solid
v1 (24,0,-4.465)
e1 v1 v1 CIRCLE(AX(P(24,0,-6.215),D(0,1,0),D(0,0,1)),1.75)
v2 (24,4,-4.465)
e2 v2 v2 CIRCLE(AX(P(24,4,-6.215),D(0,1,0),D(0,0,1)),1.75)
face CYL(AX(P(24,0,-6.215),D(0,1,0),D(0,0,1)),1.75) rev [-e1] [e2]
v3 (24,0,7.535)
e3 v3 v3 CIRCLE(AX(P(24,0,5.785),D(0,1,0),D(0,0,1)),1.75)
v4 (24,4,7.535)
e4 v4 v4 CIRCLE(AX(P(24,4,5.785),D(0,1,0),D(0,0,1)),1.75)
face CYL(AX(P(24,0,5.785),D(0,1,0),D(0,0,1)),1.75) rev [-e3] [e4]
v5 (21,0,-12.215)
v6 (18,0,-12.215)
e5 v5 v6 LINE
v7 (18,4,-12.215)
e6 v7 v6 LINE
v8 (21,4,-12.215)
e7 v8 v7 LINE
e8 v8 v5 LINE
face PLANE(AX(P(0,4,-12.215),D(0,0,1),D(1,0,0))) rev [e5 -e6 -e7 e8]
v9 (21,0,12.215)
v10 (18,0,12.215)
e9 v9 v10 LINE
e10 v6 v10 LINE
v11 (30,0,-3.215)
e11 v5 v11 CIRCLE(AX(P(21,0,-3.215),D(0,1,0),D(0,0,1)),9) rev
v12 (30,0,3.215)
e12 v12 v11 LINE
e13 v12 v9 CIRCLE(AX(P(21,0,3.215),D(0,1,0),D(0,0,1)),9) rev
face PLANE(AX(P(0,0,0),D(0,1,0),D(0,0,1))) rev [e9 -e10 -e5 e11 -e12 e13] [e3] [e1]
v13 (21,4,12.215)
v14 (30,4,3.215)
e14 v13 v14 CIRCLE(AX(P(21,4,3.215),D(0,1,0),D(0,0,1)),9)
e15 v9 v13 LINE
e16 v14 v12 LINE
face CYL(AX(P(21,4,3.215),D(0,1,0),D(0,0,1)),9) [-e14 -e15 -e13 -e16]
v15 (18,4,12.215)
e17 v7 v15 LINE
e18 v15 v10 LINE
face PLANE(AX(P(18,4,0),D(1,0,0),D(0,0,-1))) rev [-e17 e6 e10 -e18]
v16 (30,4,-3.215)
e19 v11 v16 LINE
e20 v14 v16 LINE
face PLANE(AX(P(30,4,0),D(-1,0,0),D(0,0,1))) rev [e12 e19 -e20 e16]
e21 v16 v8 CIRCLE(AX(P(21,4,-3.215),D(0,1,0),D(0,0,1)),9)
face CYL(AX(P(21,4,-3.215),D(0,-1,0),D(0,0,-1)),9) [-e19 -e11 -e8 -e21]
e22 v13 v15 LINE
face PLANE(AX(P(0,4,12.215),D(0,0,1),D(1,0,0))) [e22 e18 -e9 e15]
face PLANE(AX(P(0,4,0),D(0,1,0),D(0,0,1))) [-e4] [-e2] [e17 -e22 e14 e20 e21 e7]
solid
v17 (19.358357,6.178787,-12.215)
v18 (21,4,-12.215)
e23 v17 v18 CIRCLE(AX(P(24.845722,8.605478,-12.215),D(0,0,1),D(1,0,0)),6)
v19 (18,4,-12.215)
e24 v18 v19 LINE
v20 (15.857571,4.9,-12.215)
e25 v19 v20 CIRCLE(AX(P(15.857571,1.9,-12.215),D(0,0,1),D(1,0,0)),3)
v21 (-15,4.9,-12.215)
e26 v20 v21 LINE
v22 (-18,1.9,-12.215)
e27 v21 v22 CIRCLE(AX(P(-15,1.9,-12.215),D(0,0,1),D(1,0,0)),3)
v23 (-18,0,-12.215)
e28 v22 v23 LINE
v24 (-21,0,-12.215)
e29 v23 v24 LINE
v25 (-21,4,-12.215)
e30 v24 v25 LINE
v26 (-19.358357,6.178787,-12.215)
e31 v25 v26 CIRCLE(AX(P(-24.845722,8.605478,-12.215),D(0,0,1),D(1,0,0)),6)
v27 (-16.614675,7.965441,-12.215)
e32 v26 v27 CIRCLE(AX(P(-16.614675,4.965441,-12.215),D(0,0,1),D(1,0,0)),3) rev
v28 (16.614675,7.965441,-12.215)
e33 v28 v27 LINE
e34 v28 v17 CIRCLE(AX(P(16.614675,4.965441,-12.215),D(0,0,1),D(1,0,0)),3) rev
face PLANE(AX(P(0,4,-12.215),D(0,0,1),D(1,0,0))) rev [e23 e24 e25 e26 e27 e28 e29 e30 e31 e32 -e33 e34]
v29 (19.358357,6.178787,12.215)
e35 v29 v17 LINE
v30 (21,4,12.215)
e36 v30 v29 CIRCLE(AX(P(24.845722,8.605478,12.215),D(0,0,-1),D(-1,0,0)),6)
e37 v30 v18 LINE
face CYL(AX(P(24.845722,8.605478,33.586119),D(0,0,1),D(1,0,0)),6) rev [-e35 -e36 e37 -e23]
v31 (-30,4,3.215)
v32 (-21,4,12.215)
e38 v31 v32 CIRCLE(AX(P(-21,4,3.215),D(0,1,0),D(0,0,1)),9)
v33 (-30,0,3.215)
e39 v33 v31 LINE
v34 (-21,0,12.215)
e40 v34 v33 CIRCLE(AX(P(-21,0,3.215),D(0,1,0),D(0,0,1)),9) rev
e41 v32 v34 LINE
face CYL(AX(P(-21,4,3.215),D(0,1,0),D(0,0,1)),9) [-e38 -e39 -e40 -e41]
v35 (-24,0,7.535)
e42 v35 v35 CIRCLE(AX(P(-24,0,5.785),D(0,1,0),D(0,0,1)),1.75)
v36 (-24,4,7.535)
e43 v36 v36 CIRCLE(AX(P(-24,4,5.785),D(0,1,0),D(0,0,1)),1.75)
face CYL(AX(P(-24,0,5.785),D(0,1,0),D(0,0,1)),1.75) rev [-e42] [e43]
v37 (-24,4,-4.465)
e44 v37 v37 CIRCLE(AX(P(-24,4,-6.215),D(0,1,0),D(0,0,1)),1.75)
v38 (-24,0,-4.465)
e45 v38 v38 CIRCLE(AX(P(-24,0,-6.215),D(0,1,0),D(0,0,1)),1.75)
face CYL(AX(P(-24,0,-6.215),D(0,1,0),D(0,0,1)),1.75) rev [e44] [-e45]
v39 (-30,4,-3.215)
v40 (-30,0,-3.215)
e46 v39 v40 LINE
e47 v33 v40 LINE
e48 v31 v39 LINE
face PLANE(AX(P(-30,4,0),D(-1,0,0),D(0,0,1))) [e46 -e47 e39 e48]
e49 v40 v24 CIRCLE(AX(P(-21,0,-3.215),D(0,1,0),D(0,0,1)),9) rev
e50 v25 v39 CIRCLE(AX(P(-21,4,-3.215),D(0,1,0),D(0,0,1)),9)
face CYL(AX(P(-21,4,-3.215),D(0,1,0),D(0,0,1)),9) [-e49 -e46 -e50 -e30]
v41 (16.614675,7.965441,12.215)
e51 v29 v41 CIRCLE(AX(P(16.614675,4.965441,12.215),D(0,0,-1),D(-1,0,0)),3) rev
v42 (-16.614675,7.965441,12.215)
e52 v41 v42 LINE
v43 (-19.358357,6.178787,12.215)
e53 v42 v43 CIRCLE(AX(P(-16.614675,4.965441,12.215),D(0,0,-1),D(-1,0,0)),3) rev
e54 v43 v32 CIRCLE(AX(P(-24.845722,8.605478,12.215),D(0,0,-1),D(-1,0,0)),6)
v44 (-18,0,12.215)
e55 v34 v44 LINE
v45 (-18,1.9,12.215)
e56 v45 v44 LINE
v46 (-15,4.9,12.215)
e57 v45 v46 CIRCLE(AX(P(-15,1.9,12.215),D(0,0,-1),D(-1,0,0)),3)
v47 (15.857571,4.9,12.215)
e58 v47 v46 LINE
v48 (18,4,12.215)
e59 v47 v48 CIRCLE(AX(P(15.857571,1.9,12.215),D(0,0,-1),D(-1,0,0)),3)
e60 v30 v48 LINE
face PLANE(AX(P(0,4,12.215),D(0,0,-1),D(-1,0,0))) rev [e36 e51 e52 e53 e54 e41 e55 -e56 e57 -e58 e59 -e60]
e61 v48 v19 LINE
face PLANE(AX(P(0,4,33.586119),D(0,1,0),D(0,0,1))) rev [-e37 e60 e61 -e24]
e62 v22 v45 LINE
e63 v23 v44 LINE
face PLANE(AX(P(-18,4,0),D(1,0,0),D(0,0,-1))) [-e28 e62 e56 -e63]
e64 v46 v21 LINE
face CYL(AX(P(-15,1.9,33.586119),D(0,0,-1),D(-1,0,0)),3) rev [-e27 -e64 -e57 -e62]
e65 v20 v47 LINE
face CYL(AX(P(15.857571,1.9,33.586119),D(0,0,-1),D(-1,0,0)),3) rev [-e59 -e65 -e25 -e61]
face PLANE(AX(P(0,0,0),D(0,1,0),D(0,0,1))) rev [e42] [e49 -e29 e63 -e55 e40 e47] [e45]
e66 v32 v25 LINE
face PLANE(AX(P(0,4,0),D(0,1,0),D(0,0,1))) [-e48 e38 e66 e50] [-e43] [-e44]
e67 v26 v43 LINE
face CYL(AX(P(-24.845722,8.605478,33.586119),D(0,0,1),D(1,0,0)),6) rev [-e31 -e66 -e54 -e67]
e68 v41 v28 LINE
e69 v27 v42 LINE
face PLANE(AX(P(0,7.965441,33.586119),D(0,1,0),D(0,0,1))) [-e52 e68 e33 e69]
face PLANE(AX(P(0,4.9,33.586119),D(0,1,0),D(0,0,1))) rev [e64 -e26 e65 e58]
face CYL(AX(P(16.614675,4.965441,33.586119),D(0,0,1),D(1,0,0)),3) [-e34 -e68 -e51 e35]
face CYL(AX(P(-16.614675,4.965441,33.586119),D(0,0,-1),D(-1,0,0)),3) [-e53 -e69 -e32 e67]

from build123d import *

# Parameters (mm, degrees)
SKETCH2_W                       = 12
SKETCH2_H                       = 24.43
BOSS_EXTRUDE1_DEPTH             = 4
BOSS_EXTRUDE1_2_DEPTH           = 4
SKETCH3_R                       = 1.75
CUT_EXTRUDE1_DEPTH              = 4
FILLET1_R                       = 9
FILLET2_R                       = 9
BOSS_EXTRUDE2_REACH             = 34.637
SKETCH4_W                       = 18
SKETCH4_H                       = 3.065440856
SKETCH4_W_2                     = 1.61467478
BOSS_EXTRUDE2_DIRECTION_2_REACH = 34.637
FILLET3_R                       = 3
FILLET4_R                       = 6


with BuildPart() as part:
    # Sketch2 → Boss-Extrude1 (new body)
    with BuildSketch(Plane(origin=(0, 0, 0), x_dir=(1, 0, 0), z_dir=(0, 1, 0))):
        with Locations((-24, 0)):
            Rectangle(SKETCH2_W, SKETCH2_H)
    extrude(amount=BOSS_EXTRUDE1_DEPTH)


with BuildPart() as body_2:
    # Sketch2 → Boss-Extrude1 2 (new body)
    with BuildSketch(Plane(origin=(0, 0, 0), x_dir=(1, 0, 0), z_dir=(0, 1, 0))):
        with Locations((24, 0)):
            Rectangle(SKETCH2_W, SKETCH2_H)
    extrude(amount=BOSS_EXTRUDE1_2_DEPTH)


with BuildPart() as cut_extrude1_tool:
    # Sketch3 → Cut-Extrude1 (new body)
    with BuildSketch(Plane(origin=(0, 4, 0), x_dir=(1, 0, 0), z_dir=(0, 1, 0))):
        with Locations(Location((-24, 6.215, 0), (0, 0, 270))):
            Circle(SKETCH3_R)
        with Locations(Location((24, 6.215, 0), (0, 0, 270))):
            Circle(SKETCH3_R)
        with Locations(Location((24, -5.785, 0), (0, 0, 270))):
            Circle(SKETCH3_R)
        with Locations(Location((-24, -5.785, 0), (0, 0, 270))):
            Circle(SKETCH3_R)
    extrude(amount=-CUT_EXTRUDE1_DEPTH)


with BuildPart() as part_1:
    add(part.part)

    # Cut-Extrude1: cut by cut_extrude1_tool
    add(cut_extrude1_tool.part, mode=Mode.SUBTRACT)

    # Fillet1
    fillet1_edges = [part_1.edges().sort_by_distance(p)[0] for p in [
        (-30, 2, 12.215),
        (-30, 2, -12.215),
    ]]
    fillet(fillet1_edges, radius=FILLET1_R)

    # Boss-Extrude2: up to this face of the body (flat: up to its plane)
    boss_extrude2_end = Plane(part_1.part.faces().sort_by_distance((-19.5, 2, 12.215))[0])
    # Sketch4 → Boss-Extrude2 (add, up to the picked face)
    with BuildSketch(Plane.XY, mode=Mode.PRIVATE) as boss_extrude2_sk1:
        with Locations((-9, 6.432720428)):
            Rectangle(SKETCH4_W, SKETCH4_H)
    boss_extrude2_tool1 = split(extrude(boss_extrude2_sk1.sketch, amount=BOSS_EXTRUDE2_REACH, mode=Mode.PRIVATE), bisect_by=boss_extrude2_end, keep=Keep.BOTH, mode=Mode.PRIVATE)
    # Sketch4 → Boss-Extrude2 (add, up to the picked face)
    with BuildSketch(Plane.XY, mode=Mode.PRIVATE) as boss_extrude2_sk2:
        with Locations((-18.80733739, 6.432720428)):
            Rectangle(SKETCH4_W_2, SKETCH4_H)
    boss_extrude2_tool2 = split(extrude(boss_extrude2_sk2.sketch, amount=BOSS_EXTRUDE2_REACH, mode=Mode.PRIVATE), bisect_by=boss_extrude2_end, keep=Keep.BOTH, mode=Mode.PRIVATE)
    # Sketch4 → Boss-Extrude2 (add, up to the picked face)
    with BuildSketch(Plane.XY, mode=Mode.PRIVATE) as boss_extrude2_sk3:
        Polygon((-18, 4), (-18, 4.9), (-19.61467478, 4.9), (-21, 4), align=None)
    boss_extrude2_tool3 = split(extrude(boss_extrude2_sk3.sketch, amount=BOSS_EXTRUDE2_REACH, mode=Mode.PRIVATE), bisect_by=boss_extrude2_end, keep=Keep.BOTH, mode=Mode.PRIVATE)
    boss_extrude2_1 = boss_extrude2_tool1.solids().sort_by(Axis((-9, 6.43272, 0), (0, 0, 1)))[0]
    add(boss_extrude2_1)
    boss_extrude2_2 = boss_extrude2_tool2.solids().sort_by(Axis((-18.807337, 6.43272, 0), (0, 0, 1)))[0]
    add(boss_extrude2_2)
    boss_extrude2_3 = boss_extrude2_tool3.solids().sort_by(Axis((-19.188325, 4.40497, 0), (0, 0, 1)))[0]
    add(boss_extrude2_3)
    boss_extrude2 = boss_extrude2_1 + boss_extrude2_2 + boss_extrude2_3  # Boss-Extrude2 as one shape, for the pattern or mirror that repeats it

    # Boss-Extrude2 direction 2: up to this face of the body (flat: up to its plane)
    boss_extrude2_direction_2_end = Plane(part_1.part.faces().sort_by_distance((-19.5, 2, -12.215))[0])
    # Sketch4 → Boss-Extrude2 direction 2 (add, up to the picked face)
    with BuildSketch(Plane.XY, mode=Mode.PRIVATE) as boss_extrude2_direction_2_sk1:
        with Locations((-9, 6.432720428)):
            Rectangle(SKETCH4_W, SKETCH4_H)
    boss_extrude2_direction_2_tool1 = split(extrude(boss_extrude2_direction_2_sk1.sketch, amount=-BOSS_EXTRUDE2_DIRECTION_2_REACH, mode=Mode.PRIVATE), bisect_by=boss_extrude2_direction_2_end, keep=Keep.BOTH, mode=Mode.PRIVATE)
    # Sketch4 → Boss-Extrude2 direction 2 (add, up to the picked face)
    with BuildSketch(Plane.XY, mode=Mode.PRIVATE) as boss_extrude2_direction_2_sk2:
        with Locations((-18.80733739, 6.432720428)):
            Rectangle(SKETCH4_W_2, SKETCH4_H)
    boss_extrude2_direction_2_tool2 = split(extrude(boss_extrude2_direction_2_sk2.sketch, amount=-BOSS_EXTRUDE2_DIRECTION_2_REACH, mode=Mode.PRIVATE), bisect_by=boss_extrude2_direction_2_end, keep=Keep.BOTH, mode=Mode.PRIVATE)
    # Sketch4 → Boss-Extrude2 direction 2 (add, up to the picked face)
    with BuildSketch(Plane.XY, mode=Mode.PRIVATE) as boss_extrude2_direction_2_sk3:
        Polygon((-18, 4), (-18, 4.9), (-19.61467478, 4.9), (-21, 4), align=None)
    boss_extrude2_direction_2_tool3 = split(extrude(boss_extrude2_direction_2_sk3.sketch, amount=-BOSS_EXTRUDE2_DIRECTION_2_REACH, mode=Mode.PRIVATE), bisect_by=boss_extrude2_direction_2_end, keep=Keep.BOTH, mode=Mode.PRIVATE)
    boss_extrude2_direction_2_1 = boss_extrude2_direction_2_tool1.solids().sort_by(Axis((-9, 6.43272, 0), (0, 0, -1)))[0]
    add(boss_extrude2_direction_2_1)
    boss_extrude2_direction_2_2 = boss_extrude2_direction_2_tool2.solids().sort_by(Axis((-18.807337, 6.43272, 0), (0, 0, -1)))[0]
    add(boss_extrude2_direction_2_2)
    boss_extrude2_direction_2_3 = boss_extrude2_direction_2_tool3.solids().sort_by(Axis((-19.188325, 4.40497, 0), (0, 0, -1)))[0]
    add(boss_extrude2_direction_2_3)
    boss_extrude2_direction_2 = boss_extrude2_direction_2_1 + boss_extrude2_direction_2_2 + boss_extrude2_direction_2_3  # Boss-Extrude2 direction 2 as one shape, for the pattern or mirror that repeats it

    # Mirror1: Boss-Extrude2, Boss-Extrude2 direction 2 across plane
    add(boss_extrude2.mirror(Plane(origin=(0, 0, 0), x_dir=(0, 0, 1), z_dir=(1, 0, 0))))
    add(boss_extrude2_direction_2.mirror(Plane(origin=(0, 0, 0), x_dir=(0, 0, 1), z_dir=(1, 0, 0))))

    # Fillet3
    # the kernel refuses this fillet: 3 mm, written as the material it adds along each edge
    with BuildSketch(Plane(origin=(18, 4.9, -12.215), x_dir=(-1, 0, 0), z_dir=(0, 0, 1))) as fillet3_piece_1:
        with BuildLine():
            CenterArc((2.142428529, 3), FILLET3_R, 224.427004001, 45.572995999)
            Line((0, 0.9), (0, 0))
            Line((0, 0), (2.142428529, 0))
        make_face()
    extrude(amount=24.43)
    with BuildSketch(Plane(origin=(-18, 4.9, -12.215), x_dir=(0, -1, 0), z_dir=(0, 0, 1))) as fillet3_piece_2:
        with BuildLine():
            CenterArc((FILLET3_R, FILLET3_R), FILLET3_R, 180, 90)
            Line((0, FILLET3_R), (0, 0))
            Line((0, 0), (FILLET3_R, 0))
        make_face()
    extrude(amount=24.43)
    # the kernel refuses this fillet: 3 mm, written as the material it takes off along each edge
    with BuildSketch(Plane(origin=(19.61467478, 7.965440856, 19.715), x_dir=(-1, 0, 0), z_dir=(0, 0, -1)), Plane(origin=(-19.61467478, 7.965440856, 19.715), x_dir=(0, -1, 0), z_dir=(0, 0, -1))) as fillet3_2_piece_1:
        with BuildLine():
            CenterArc((FILLET3_R, -FILLET3_R), FILLET3_R, 90, 90)
            Line((0, -FILLET3_R), (0, 0))
            Line((0, 0), (FILLET3_R, 0))
        make_face()
    extrude(amount=39.43, mode=Mode.SUBTRACT)

    # Fillet4
    # the kernel refuses this fillet: 6 mm, written as the material it adds along each edge
    with BuildSketch(Plane(origin=(19.61467478, 4.9, 12.215), x_dir=(0.8385712137363982, -0.5447919965387378, 0), z_dir=(0, 0, -1))) as fillet4_piece_1_section:
        with BuildLine():
            CenterArc((2.367890606, -5.957139428), FILLET4_R, 96.852512832, 26.280461669)
            Line((-0.911613329, -0.932713695), (-1.239563722, -0.430271121))
            ThreePointArc((-1.239563722, -0.430271121), (-0.538794383, 0.27199838), (-0.503142728, 0.326875198))
            Line((-0.503142728, 0.326875198), (0, 0.6))
            ThreePointArc((0, 0.6), (0.826003324, 0.6), (1.580418252, 0.595713943))
            Line((1.580418252, 0.595713943), (1.652006648, 0))
        make_face()
    fillet4_piece_1 = extrude(amount=24.43, mode=Mode.PRIVATE)
    fillet4_piece_1 = split(fillet4_piece_1, bisect_by=Plane(origin=(19.61467478, 4, 12.215), z_dir=(0, 1, 0)), keep=Keep.TOP, mode=Mode.PRIVATE)
    add(fillet4_piece_1)
    with BuildSketch(Plane(origin=(-19.61467478, 4.9, 12.215), x_dir=(0.19652930214172712, 0.9804979517570068, 0), z_dir=(0, 0, -1))) as fillet4_piece_2:
        with BuildLine():
            CenterArc((2.605159409, -5.857265619), FILLET4_R, 102.522499919, 26.280461669)
            Line((-1.154705155, -1.181432169), (-1.530691612, -0.713848824))
            ThreePointArc((-1.530691612, -0.713848824), (-1.006442438, -0.171333333), (-0.42908986, 0.419382751))
            Line((-0.42908986, 0.419382751), (0.117917581, 0.588298771))
            ThreePointArc((0.117917581, 0.588298771), (0.182082206, 0.575437725), (1.174127699, 0.585726562))
            Line((1.174127699, 0.585726562), (1.304221491, 0))
        make_face()
    extrude(amount=24.43)


with BuildPart() as body_2_1:
    add(body_2.part)

    # Cut-Extrude1: cut by cut_extrude1_tool
    add(cut_extrude1_tool.part, mode=Mode.SUBTRACT)

    # Fillet2
    fillet2_edges = [body_2_1.edges().sort_by_distance(p)[0] for p in [
        (30, 2, -12.215),
        (30, 2, 12.215),
    ]]
    fillet(fillet2_edges, radius=FILLET2_R)


solid = Compound([part_1.part, body_2_1.part])
